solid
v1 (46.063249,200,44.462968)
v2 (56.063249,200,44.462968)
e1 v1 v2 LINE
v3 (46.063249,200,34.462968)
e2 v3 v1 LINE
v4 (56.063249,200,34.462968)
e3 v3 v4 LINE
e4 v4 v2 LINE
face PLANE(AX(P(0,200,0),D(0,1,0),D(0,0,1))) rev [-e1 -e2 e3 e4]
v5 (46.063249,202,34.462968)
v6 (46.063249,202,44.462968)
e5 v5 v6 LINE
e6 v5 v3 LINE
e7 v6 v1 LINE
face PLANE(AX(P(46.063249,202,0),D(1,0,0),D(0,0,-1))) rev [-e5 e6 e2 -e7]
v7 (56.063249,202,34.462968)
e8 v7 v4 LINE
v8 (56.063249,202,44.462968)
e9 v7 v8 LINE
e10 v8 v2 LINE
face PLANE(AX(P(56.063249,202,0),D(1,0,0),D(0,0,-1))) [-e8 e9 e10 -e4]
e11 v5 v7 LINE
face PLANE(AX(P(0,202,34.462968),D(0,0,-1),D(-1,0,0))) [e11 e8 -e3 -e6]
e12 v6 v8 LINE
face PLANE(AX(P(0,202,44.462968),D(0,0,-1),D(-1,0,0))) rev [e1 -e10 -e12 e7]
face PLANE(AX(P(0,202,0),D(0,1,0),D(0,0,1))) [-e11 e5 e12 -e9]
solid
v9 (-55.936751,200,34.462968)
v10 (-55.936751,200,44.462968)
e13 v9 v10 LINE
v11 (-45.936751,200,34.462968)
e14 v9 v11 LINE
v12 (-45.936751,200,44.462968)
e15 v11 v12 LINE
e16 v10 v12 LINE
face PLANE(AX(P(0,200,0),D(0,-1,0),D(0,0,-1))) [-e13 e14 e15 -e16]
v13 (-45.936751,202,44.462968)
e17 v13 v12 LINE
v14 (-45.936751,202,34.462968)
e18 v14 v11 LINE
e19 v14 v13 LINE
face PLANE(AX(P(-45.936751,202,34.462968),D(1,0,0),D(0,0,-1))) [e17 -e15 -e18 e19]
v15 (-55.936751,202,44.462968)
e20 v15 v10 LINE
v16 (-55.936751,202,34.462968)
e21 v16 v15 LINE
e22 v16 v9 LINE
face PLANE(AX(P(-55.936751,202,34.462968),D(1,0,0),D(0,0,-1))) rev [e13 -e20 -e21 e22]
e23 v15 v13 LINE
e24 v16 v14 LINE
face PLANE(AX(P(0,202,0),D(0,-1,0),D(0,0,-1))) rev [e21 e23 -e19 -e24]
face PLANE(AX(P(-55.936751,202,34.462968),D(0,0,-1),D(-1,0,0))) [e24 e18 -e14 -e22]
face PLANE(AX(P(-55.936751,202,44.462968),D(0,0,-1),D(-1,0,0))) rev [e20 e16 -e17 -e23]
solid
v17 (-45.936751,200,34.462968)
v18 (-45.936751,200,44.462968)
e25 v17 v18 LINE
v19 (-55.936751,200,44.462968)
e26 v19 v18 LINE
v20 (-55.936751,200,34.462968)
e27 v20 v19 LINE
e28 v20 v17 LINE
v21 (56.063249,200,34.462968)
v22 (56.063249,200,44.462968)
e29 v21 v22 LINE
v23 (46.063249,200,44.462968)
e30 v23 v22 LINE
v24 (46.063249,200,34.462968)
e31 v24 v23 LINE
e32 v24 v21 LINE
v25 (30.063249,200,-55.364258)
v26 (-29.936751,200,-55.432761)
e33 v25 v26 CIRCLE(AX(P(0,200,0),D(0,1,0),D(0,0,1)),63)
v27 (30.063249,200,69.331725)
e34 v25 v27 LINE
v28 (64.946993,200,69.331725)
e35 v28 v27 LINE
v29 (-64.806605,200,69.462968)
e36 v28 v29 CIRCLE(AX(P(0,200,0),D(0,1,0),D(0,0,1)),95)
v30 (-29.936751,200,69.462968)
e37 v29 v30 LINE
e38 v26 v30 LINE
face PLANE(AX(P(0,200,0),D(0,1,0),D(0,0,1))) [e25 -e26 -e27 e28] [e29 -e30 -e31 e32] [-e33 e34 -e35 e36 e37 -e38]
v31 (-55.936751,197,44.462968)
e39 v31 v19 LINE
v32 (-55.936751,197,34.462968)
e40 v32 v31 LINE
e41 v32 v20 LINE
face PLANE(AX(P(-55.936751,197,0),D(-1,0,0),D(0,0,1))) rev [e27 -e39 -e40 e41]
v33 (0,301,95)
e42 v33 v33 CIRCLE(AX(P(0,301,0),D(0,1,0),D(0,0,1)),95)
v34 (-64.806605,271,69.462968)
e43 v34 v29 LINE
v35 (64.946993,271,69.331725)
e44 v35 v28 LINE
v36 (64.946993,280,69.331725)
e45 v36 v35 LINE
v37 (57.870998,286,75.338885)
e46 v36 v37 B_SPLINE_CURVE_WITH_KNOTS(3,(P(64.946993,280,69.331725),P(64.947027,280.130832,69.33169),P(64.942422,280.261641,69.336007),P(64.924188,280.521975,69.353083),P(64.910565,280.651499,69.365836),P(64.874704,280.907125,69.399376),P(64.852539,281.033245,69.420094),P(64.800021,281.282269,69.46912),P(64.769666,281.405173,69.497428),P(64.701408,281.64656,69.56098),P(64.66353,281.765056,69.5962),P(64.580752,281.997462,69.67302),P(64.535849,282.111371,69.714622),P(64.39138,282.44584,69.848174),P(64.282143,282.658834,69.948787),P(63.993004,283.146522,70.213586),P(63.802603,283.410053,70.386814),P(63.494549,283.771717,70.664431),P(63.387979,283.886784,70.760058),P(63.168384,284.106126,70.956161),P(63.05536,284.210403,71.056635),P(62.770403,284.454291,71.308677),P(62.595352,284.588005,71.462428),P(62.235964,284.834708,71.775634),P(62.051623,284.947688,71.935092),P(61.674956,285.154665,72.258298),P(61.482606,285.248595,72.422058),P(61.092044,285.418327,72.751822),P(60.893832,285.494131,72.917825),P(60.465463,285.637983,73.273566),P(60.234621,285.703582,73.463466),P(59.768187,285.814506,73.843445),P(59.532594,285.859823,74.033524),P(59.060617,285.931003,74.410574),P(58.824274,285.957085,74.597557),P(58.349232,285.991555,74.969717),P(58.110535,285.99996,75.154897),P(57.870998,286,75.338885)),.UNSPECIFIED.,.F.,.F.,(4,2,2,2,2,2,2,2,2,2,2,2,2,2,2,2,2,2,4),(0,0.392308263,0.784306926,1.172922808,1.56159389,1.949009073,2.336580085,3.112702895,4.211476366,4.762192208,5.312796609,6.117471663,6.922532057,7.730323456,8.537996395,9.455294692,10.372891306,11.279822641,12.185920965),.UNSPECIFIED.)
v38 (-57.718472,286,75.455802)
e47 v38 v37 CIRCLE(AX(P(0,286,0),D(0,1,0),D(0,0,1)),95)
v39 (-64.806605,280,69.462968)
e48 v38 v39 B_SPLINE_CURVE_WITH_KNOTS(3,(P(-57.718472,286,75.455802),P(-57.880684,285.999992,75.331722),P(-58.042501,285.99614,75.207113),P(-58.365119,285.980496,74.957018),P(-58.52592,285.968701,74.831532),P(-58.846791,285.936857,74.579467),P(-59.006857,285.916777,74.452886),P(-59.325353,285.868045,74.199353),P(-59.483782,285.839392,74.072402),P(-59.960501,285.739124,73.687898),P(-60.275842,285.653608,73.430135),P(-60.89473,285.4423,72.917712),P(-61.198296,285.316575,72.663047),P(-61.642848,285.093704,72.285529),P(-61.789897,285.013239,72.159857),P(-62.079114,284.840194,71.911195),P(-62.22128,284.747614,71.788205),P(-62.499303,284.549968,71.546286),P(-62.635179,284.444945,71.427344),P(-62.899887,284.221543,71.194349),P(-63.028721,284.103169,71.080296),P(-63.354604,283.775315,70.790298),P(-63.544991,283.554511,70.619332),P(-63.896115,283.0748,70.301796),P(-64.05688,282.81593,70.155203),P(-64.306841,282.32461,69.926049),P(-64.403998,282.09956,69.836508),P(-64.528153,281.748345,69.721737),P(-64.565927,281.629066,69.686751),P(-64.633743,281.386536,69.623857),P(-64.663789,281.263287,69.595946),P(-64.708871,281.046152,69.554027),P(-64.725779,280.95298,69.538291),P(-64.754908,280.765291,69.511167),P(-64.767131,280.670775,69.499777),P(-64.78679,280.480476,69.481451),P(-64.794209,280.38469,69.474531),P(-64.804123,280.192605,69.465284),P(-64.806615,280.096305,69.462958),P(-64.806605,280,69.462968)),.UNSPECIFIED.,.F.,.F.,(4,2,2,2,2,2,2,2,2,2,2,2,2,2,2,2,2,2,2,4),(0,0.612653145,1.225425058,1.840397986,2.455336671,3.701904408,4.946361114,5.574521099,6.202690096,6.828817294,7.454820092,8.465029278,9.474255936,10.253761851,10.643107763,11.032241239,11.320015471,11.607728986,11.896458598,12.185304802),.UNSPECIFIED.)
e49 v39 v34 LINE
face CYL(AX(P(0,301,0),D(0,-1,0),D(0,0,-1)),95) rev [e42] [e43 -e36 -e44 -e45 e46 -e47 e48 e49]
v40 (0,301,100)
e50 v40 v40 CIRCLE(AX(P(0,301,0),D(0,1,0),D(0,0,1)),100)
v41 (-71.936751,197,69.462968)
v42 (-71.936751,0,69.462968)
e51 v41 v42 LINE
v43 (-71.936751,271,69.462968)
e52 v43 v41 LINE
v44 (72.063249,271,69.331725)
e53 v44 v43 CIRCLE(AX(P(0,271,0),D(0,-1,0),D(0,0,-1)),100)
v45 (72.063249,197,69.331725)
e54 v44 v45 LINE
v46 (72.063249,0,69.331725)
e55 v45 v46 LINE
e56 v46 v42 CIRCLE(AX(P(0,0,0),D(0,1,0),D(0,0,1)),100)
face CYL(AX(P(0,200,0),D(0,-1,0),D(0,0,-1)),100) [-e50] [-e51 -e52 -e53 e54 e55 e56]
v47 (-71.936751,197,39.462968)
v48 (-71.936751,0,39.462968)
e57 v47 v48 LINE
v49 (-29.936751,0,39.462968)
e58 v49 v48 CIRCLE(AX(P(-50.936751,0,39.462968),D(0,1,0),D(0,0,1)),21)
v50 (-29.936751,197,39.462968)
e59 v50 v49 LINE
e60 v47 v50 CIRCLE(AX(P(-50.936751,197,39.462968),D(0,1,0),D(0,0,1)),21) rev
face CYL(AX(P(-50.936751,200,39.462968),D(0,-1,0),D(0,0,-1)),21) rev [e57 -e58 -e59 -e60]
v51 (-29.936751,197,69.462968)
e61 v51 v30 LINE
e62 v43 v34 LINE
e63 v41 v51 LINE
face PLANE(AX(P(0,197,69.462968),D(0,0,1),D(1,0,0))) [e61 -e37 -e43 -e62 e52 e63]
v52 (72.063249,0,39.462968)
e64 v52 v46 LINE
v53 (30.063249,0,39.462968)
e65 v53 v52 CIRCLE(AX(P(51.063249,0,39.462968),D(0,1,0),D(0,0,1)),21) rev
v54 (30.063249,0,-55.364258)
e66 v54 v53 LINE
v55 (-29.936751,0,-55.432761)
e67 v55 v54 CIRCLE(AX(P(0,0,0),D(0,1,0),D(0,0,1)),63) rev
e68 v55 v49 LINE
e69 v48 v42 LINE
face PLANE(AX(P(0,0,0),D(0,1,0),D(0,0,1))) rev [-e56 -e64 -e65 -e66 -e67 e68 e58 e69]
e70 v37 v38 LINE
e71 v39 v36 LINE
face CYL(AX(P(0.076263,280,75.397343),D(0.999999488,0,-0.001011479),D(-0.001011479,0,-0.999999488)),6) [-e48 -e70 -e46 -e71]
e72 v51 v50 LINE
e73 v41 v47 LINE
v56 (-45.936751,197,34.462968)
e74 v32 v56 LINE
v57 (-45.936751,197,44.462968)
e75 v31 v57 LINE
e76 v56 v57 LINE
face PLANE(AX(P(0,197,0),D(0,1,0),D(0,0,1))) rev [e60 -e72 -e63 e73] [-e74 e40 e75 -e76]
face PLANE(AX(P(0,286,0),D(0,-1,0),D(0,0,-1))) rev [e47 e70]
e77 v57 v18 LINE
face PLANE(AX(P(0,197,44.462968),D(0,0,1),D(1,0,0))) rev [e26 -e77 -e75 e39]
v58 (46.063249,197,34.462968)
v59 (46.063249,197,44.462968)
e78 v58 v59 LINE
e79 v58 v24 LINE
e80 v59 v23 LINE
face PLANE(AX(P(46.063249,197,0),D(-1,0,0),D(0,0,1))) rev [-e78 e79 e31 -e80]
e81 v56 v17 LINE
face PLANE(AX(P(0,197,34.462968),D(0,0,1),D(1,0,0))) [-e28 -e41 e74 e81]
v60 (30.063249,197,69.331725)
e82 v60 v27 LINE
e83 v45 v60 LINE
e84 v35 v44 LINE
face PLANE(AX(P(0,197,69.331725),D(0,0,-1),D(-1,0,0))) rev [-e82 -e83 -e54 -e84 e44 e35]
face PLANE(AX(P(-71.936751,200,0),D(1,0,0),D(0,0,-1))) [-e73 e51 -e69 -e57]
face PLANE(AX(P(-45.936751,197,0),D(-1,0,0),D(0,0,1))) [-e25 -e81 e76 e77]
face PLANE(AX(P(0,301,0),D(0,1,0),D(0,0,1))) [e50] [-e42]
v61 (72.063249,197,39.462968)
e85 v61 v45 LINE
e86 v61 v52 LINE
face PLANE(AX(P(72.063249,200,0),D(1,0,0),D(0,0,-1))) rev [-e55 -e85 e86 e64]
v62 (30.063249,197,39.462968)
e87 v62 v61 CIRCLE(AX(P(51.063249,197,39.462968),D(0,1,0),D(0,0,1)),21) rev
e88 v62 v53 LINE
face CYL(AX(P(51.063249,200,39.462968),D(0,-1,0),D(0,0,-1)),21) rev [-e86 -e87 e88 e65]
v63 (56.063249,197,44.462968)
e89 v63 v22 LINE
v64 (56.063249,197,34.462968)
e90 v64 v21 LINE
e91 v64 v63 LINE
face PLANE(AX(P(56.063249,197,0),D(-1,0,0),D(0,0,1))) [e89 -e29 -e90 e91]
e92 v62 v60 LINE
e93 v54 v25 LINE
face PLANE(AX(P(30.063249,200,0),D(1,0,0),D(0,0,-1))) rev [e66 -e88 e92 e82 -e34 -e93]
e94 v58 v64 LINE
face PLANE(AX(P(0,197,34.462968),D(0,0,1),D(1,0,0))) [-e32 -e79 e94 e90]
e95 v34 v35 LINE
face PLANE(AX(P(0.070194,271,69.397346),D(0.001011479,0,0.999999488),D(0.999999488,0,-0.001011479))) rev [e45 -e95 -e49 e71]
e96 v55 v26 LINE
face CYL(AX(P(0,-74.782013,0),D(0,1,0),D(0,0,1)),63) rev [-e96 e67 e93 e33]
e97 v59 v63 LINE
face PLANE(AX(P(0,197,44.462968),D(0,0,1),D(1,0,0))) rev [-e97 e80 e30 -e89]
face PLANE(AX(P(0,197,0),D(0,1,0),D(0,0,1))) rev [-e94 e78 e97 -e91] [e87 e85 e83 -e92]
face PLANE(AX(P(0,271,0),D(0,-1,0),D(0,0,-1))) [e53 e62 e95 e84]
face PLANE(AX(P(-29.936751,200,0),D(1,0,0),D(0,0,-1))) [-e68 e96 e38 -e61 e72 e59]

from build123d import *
from build123d.topology import SkipClean

# Parameters (mm, degrees)
BOSS_EXTRUDE2_DEPTH   = 200
BOSS_EXTRUDE2_2_DEPTH = 200
BOSS_EXTRUDE3_START   = -3
SKETCH3_W             = 10
SKETCH3_H             = 10
BOSS_EXTRUDE3_DEPTH   = 3
SKETCH4_W             = 10
SKETCH4_H             = 10
BOSS_EXTRUDE4_DEPTH   = 3
SKETCH5_W             = 10
SKETCH5_H             = 10
BOSS_EXTRUDE5_DEPTH   = 2
BOSS_EXTRUDE5_2_DEPTH = 2
BOSS_EXTRUDE6_START   = -200
BOSS_EXTRUDE6_DEPTH   = 200
BOSS_EXTRUDE7_DEPTH   = 101
BOSS_EXTRUDE8_START   = -15
BOSS_EXTRUDE8_DEPTH   = 15
BOSS_EXTRUDE9_START   = 15
BOSS_EXTRUDE9_DEPTH   = 15
FILLET2_R             = 6


with BuildPart() as part:
    # Sketch2 → Boss-Extrude2 (new body)
    with BuildSketch(Plane(origin=(0, 0, 0), x_dir=(1, 0, 0), z_dir=(0, 1, 0))):
        with BuildLine():
            Line((-29.936750537, 95.41378814), (-29.936750537, -39.462967992))
            ThreePointArc((-29.936750537, -39.462967992), (-50.936750537, -18.462967992), (-71.936750537, -39.462967992))
            Line((-71.936750537, -39.462967992), (-71.936750537, -69.462967992))
            ThreePointArc((-71.936750537, -69.462967992), (-96.905308077, 24.685243904), (-29.936750537, 95.41378814))
        make_face()
    extrude(amount=BOSS_EXTRUDE2_DEPTH)

    # Sketch3 → Boss-Extrude3 (add)
    with BuildSketch(Plane(origin=(0, 200, 0), x_dir=(1, 0, 0), z_dir=(0, 1, 0)).offset(BOSS_EXTRUDE3_START)):
        with BuildLine():
            Line((-71.936750537, -69.462967992), (-29.936750537, -69.462967992))
            Line((-29.936750537, -69.462967992), (-29.936750537, -39.462967992))
            ThreePointArc((-29.936750537, -39.462967992), (-50.936750537, -18.462967992), (-71.936750537, -39.462967992))
            Line((-71.936750537, -39.462967992), (-71.936750537, -69.462967992))
        make_face()
        with Locations((-50.936750537, -39.462967992)):
            Rectangle(SKETCH3_W, SKETCH3_H, mode=Mode.SUBTRACT)
    extrude(amount=BOSS_EXTRUDE3_DEPTH)



with BuildPart() as body_2:
    # Sketch2 → Boss-Extrude2 2 (new body)
    with BuildSketch(Plane(origin=(0, 0, 0), x_dir=(1, 0, 0), z_dir=(0, 1, 0))):
        with BuildLine():
            ThreePointArc((72.063249463, -69.331724894), (96.899173876, 24.709312052), (30.063249463, 95.374006059))
            Line((30.063249463, 95.374006059), (30.063249463, -39.462967992))
            ThreePointArc((30.063249463, -39.462967992), (51.063249463, -18.462967992), (72.063249463, -39.462967992))
            Line((72.063249463, -39.462967992), (72.063249463, -69.331724894))
        make_face()
    extrude(amount=BOSS_EXTRUDE2_2_DEPTH)

    # Sketch4 → Boss-Extrude4 (add)
    with BuildSketch(Plane(origin=(0, 200, 0), x_dir=(1, 0, 0), z_dir=(0, 1, 0))):
        with BuildLine():
            Line((30.063249463, -39.462967992), (30.063249463, -69.331724894))
            Line((30.063249463, -69.331724894), (72.063249463, -69.331724894))
            Line((72.063249463, -69.331724894), (72.063249463, -39.462967992))
            ThreePointArc((72.063249463, -39.462967992), (51.063249463, -18.462967992), (30.063249463, -39.462967992))
        make_face()
        with Locations((51.063249463, -39.462967992)):
            Rectangle(SKETCH4_W, SKETCH4_H, mode=Mode.SUBTRACT)
    extrude(amount=-BOSS_EXTRUDE4_DEPTH)


with BuildPart() as body_3:
    # Sketch5 → Boss-Extrude5 (new body)
    with BuildSketch(Plane(origin=(0, 200, 0), x_dir=(1, 0, 0), z_dir=(0, 1, 0))):
        with Locations((51.063249463, -39.462967992)):
            Rectangle(SKETCH5_W, SKETCH5_H)
    extrude(amount=BOSS_EXTRUDE5_DEPTH)


with BuildPart() as body_4:
    # Sketch5 → Boss-Extrude5 2 (new body)
    with BuildSketch(Plane(origin=(0, 200, 0), x_dir=(1, 0, 0), z_dir=(0, 1, 0))):
        with Locations((-50.936750537, -39.462967992)):
            Rectangle(SKETCH5_W, SKETCH5_H)
    extrude(amount=BOSS_EXTRUDE5_2_DEPTH)


with BuildPart() as part_1:
    add(part.part)

    add(body_2.part)  # Boss-Extrude6 merges body 2
    # Sketch7 → Boss-Extrude6 (add)
    with BuildSketch(Plane(origin=(0, 200, 0), x_dir=(1, 0, 0), z_dir=(0, 1, 0)).offset(BOSS_EXTRUDE6_START)):
        with BuildLine():
            Line((-29.936750537, 95.41378814), (-29.936750537, 55.432760777))
            ThreePointArc((-29.936750537, 55.432760777), (0.071928174, 62.999958939), (30.063249463, 55.364257709))
            Line((30.063249463, 55.364257709), (30.063249463, 95.374006059))
            ThreePointArc((30.063249463, 95.374006059), (0.066303455, 99.999978019), (-29.936750537, 95.41378814))
        make_face()
    extrude(amount=BOSS_EXTRUDE6_DEPTH)

    # Sketch8 → Boss-Extrude7 (add)
    with SkipClean():  # the faces are left unmerged after this step: merging them gives an invalid solid
        with BuildSketch(Plane(origin=(0, 200, 0), x_dir=(1, 0, 0), z_dir=(0, 1, 0))):
            with BuildLine():
                Line((-71.936750537, -69.462967992), (-64.806605202, -69.462967992))
                ThreePointArc((-64.806605202, -69.462967992), (-0.096090498, 94.999951403), (64.946993181, -69.331724894))
                Line((64.946993181, -69.331724894), (72.063249463, -69.331724894))
                ThreePointArc((72.063249463, -69.331724894), (-0.091141002, 99.999958467), (-71.936750537, -69.462967992))
            make_face()
        extrude(amount=BOSS_EXTRUDE7_DEPTH)
    add(part_1.part.scale(1), mode=Mode.REPLACE)  # the faces are merged on a copy

    # Sketch10 → Boss-Extrude8 (add)
    with BuildSketch(Plane(origin=(0, 301, 0), x_dir=(1, 0, 0), z_dir=(0, 1, 0)).offset(BOSS_EXTRUDE8_START)):
        with BuildLine():
            Line((-71.936750537, -69.462967992), (-64.806605202, -69.462967992))
            ThreePointArc((-64.806605202, -69.462967992), (0.096090498, -94.999951403), (64.946993181, -69.331724894))
            Line((64.946993181, -69.331724894), (72.063249463, -69.331724894))
            ThreePointArc((72.063249463, -69.331724894), (0.091141002, -99.999958467), (-71.936750537, -69.462967992))
        make_face()
    extrude(amount=BOSS_EXTRUDE8_DEPTH)

    # Sketch11 → Boss-Extrude9 (add)
    with SkipClean():  # the faces are left unmerged after this step: merging them gives an invalid solid
        with BuildSketch(Plane.XZ.offset(-286).offset(BOSS_EXTRUDE9_START)):
            with BuildLine():
                ThreePointArc((72.063249463, 69.331724894), (0.091141002, 99.999958467), (-71.936750537, 69.462967992))
                Line((-71.936750537, 69.462967992), (-64.806605202, 69.462967992))
                ThreePointArc((-64.806605202, 69.462967992), (0.096090498, 94.999951403), (64.946993181, 69.331724894))
                Line((64.946993181, 69.331724894), (72.063249463, 69.331724894))
            make_face()
            with BuildLine():
                Line((-64.806605202, 69.462967992), (64.946993181, 69.331724894))
                ThreePointArc((64.946993181, 69.331724894), (0.096090498, 94.999951403), (-64.806605202, 69.462967992))
            make_face()
        extrude(amount=-BOSS_EXTRUDE9_DEPTH)
    add(part_1.part.scale(1), mode=Mode.REPLACE)  # the faces are merged on a copy

    # Fillet2
    # the kernel refuses this fillet: 6 mm, written as the material it takes off along each edge
    with BuildSketch(Plane(origin=(-79.806597528, 286, 69.478140176), x_dir=(0, -1, 0), z_dir=(0.9999994884550568, 0, -0.0010114789294520309))) as fillet2_piece_1_section:
        with BuildLine():
            CenterArc((FILLET2_R, -FILLET2_R), FILLET2_R, 90, 90)
            Line((0, -FILLET2_R), (0, 0))
            Line((0, 0), (FILLET2_R, 0))
        make_face()
    fillet2_piece_1 = extrude(amount=159.753664757, mode=Mode.PRIVATE)
    fillet2_piece_1 = fillet2_piece_1 & Plane(origin=(0, 284.623966258, 0), x_dir=(-0.6821747915961063, 0, 0.7311891367565639), z_dir=(0, -1, 0)) * Cylinder(95, 344, mode=Mode.PRIVATE)
    add(fillet2_piece_1, mode=Mode.SUBTRACT)


solid = Compound([body_3.part, body_4.part, part_1.part])
